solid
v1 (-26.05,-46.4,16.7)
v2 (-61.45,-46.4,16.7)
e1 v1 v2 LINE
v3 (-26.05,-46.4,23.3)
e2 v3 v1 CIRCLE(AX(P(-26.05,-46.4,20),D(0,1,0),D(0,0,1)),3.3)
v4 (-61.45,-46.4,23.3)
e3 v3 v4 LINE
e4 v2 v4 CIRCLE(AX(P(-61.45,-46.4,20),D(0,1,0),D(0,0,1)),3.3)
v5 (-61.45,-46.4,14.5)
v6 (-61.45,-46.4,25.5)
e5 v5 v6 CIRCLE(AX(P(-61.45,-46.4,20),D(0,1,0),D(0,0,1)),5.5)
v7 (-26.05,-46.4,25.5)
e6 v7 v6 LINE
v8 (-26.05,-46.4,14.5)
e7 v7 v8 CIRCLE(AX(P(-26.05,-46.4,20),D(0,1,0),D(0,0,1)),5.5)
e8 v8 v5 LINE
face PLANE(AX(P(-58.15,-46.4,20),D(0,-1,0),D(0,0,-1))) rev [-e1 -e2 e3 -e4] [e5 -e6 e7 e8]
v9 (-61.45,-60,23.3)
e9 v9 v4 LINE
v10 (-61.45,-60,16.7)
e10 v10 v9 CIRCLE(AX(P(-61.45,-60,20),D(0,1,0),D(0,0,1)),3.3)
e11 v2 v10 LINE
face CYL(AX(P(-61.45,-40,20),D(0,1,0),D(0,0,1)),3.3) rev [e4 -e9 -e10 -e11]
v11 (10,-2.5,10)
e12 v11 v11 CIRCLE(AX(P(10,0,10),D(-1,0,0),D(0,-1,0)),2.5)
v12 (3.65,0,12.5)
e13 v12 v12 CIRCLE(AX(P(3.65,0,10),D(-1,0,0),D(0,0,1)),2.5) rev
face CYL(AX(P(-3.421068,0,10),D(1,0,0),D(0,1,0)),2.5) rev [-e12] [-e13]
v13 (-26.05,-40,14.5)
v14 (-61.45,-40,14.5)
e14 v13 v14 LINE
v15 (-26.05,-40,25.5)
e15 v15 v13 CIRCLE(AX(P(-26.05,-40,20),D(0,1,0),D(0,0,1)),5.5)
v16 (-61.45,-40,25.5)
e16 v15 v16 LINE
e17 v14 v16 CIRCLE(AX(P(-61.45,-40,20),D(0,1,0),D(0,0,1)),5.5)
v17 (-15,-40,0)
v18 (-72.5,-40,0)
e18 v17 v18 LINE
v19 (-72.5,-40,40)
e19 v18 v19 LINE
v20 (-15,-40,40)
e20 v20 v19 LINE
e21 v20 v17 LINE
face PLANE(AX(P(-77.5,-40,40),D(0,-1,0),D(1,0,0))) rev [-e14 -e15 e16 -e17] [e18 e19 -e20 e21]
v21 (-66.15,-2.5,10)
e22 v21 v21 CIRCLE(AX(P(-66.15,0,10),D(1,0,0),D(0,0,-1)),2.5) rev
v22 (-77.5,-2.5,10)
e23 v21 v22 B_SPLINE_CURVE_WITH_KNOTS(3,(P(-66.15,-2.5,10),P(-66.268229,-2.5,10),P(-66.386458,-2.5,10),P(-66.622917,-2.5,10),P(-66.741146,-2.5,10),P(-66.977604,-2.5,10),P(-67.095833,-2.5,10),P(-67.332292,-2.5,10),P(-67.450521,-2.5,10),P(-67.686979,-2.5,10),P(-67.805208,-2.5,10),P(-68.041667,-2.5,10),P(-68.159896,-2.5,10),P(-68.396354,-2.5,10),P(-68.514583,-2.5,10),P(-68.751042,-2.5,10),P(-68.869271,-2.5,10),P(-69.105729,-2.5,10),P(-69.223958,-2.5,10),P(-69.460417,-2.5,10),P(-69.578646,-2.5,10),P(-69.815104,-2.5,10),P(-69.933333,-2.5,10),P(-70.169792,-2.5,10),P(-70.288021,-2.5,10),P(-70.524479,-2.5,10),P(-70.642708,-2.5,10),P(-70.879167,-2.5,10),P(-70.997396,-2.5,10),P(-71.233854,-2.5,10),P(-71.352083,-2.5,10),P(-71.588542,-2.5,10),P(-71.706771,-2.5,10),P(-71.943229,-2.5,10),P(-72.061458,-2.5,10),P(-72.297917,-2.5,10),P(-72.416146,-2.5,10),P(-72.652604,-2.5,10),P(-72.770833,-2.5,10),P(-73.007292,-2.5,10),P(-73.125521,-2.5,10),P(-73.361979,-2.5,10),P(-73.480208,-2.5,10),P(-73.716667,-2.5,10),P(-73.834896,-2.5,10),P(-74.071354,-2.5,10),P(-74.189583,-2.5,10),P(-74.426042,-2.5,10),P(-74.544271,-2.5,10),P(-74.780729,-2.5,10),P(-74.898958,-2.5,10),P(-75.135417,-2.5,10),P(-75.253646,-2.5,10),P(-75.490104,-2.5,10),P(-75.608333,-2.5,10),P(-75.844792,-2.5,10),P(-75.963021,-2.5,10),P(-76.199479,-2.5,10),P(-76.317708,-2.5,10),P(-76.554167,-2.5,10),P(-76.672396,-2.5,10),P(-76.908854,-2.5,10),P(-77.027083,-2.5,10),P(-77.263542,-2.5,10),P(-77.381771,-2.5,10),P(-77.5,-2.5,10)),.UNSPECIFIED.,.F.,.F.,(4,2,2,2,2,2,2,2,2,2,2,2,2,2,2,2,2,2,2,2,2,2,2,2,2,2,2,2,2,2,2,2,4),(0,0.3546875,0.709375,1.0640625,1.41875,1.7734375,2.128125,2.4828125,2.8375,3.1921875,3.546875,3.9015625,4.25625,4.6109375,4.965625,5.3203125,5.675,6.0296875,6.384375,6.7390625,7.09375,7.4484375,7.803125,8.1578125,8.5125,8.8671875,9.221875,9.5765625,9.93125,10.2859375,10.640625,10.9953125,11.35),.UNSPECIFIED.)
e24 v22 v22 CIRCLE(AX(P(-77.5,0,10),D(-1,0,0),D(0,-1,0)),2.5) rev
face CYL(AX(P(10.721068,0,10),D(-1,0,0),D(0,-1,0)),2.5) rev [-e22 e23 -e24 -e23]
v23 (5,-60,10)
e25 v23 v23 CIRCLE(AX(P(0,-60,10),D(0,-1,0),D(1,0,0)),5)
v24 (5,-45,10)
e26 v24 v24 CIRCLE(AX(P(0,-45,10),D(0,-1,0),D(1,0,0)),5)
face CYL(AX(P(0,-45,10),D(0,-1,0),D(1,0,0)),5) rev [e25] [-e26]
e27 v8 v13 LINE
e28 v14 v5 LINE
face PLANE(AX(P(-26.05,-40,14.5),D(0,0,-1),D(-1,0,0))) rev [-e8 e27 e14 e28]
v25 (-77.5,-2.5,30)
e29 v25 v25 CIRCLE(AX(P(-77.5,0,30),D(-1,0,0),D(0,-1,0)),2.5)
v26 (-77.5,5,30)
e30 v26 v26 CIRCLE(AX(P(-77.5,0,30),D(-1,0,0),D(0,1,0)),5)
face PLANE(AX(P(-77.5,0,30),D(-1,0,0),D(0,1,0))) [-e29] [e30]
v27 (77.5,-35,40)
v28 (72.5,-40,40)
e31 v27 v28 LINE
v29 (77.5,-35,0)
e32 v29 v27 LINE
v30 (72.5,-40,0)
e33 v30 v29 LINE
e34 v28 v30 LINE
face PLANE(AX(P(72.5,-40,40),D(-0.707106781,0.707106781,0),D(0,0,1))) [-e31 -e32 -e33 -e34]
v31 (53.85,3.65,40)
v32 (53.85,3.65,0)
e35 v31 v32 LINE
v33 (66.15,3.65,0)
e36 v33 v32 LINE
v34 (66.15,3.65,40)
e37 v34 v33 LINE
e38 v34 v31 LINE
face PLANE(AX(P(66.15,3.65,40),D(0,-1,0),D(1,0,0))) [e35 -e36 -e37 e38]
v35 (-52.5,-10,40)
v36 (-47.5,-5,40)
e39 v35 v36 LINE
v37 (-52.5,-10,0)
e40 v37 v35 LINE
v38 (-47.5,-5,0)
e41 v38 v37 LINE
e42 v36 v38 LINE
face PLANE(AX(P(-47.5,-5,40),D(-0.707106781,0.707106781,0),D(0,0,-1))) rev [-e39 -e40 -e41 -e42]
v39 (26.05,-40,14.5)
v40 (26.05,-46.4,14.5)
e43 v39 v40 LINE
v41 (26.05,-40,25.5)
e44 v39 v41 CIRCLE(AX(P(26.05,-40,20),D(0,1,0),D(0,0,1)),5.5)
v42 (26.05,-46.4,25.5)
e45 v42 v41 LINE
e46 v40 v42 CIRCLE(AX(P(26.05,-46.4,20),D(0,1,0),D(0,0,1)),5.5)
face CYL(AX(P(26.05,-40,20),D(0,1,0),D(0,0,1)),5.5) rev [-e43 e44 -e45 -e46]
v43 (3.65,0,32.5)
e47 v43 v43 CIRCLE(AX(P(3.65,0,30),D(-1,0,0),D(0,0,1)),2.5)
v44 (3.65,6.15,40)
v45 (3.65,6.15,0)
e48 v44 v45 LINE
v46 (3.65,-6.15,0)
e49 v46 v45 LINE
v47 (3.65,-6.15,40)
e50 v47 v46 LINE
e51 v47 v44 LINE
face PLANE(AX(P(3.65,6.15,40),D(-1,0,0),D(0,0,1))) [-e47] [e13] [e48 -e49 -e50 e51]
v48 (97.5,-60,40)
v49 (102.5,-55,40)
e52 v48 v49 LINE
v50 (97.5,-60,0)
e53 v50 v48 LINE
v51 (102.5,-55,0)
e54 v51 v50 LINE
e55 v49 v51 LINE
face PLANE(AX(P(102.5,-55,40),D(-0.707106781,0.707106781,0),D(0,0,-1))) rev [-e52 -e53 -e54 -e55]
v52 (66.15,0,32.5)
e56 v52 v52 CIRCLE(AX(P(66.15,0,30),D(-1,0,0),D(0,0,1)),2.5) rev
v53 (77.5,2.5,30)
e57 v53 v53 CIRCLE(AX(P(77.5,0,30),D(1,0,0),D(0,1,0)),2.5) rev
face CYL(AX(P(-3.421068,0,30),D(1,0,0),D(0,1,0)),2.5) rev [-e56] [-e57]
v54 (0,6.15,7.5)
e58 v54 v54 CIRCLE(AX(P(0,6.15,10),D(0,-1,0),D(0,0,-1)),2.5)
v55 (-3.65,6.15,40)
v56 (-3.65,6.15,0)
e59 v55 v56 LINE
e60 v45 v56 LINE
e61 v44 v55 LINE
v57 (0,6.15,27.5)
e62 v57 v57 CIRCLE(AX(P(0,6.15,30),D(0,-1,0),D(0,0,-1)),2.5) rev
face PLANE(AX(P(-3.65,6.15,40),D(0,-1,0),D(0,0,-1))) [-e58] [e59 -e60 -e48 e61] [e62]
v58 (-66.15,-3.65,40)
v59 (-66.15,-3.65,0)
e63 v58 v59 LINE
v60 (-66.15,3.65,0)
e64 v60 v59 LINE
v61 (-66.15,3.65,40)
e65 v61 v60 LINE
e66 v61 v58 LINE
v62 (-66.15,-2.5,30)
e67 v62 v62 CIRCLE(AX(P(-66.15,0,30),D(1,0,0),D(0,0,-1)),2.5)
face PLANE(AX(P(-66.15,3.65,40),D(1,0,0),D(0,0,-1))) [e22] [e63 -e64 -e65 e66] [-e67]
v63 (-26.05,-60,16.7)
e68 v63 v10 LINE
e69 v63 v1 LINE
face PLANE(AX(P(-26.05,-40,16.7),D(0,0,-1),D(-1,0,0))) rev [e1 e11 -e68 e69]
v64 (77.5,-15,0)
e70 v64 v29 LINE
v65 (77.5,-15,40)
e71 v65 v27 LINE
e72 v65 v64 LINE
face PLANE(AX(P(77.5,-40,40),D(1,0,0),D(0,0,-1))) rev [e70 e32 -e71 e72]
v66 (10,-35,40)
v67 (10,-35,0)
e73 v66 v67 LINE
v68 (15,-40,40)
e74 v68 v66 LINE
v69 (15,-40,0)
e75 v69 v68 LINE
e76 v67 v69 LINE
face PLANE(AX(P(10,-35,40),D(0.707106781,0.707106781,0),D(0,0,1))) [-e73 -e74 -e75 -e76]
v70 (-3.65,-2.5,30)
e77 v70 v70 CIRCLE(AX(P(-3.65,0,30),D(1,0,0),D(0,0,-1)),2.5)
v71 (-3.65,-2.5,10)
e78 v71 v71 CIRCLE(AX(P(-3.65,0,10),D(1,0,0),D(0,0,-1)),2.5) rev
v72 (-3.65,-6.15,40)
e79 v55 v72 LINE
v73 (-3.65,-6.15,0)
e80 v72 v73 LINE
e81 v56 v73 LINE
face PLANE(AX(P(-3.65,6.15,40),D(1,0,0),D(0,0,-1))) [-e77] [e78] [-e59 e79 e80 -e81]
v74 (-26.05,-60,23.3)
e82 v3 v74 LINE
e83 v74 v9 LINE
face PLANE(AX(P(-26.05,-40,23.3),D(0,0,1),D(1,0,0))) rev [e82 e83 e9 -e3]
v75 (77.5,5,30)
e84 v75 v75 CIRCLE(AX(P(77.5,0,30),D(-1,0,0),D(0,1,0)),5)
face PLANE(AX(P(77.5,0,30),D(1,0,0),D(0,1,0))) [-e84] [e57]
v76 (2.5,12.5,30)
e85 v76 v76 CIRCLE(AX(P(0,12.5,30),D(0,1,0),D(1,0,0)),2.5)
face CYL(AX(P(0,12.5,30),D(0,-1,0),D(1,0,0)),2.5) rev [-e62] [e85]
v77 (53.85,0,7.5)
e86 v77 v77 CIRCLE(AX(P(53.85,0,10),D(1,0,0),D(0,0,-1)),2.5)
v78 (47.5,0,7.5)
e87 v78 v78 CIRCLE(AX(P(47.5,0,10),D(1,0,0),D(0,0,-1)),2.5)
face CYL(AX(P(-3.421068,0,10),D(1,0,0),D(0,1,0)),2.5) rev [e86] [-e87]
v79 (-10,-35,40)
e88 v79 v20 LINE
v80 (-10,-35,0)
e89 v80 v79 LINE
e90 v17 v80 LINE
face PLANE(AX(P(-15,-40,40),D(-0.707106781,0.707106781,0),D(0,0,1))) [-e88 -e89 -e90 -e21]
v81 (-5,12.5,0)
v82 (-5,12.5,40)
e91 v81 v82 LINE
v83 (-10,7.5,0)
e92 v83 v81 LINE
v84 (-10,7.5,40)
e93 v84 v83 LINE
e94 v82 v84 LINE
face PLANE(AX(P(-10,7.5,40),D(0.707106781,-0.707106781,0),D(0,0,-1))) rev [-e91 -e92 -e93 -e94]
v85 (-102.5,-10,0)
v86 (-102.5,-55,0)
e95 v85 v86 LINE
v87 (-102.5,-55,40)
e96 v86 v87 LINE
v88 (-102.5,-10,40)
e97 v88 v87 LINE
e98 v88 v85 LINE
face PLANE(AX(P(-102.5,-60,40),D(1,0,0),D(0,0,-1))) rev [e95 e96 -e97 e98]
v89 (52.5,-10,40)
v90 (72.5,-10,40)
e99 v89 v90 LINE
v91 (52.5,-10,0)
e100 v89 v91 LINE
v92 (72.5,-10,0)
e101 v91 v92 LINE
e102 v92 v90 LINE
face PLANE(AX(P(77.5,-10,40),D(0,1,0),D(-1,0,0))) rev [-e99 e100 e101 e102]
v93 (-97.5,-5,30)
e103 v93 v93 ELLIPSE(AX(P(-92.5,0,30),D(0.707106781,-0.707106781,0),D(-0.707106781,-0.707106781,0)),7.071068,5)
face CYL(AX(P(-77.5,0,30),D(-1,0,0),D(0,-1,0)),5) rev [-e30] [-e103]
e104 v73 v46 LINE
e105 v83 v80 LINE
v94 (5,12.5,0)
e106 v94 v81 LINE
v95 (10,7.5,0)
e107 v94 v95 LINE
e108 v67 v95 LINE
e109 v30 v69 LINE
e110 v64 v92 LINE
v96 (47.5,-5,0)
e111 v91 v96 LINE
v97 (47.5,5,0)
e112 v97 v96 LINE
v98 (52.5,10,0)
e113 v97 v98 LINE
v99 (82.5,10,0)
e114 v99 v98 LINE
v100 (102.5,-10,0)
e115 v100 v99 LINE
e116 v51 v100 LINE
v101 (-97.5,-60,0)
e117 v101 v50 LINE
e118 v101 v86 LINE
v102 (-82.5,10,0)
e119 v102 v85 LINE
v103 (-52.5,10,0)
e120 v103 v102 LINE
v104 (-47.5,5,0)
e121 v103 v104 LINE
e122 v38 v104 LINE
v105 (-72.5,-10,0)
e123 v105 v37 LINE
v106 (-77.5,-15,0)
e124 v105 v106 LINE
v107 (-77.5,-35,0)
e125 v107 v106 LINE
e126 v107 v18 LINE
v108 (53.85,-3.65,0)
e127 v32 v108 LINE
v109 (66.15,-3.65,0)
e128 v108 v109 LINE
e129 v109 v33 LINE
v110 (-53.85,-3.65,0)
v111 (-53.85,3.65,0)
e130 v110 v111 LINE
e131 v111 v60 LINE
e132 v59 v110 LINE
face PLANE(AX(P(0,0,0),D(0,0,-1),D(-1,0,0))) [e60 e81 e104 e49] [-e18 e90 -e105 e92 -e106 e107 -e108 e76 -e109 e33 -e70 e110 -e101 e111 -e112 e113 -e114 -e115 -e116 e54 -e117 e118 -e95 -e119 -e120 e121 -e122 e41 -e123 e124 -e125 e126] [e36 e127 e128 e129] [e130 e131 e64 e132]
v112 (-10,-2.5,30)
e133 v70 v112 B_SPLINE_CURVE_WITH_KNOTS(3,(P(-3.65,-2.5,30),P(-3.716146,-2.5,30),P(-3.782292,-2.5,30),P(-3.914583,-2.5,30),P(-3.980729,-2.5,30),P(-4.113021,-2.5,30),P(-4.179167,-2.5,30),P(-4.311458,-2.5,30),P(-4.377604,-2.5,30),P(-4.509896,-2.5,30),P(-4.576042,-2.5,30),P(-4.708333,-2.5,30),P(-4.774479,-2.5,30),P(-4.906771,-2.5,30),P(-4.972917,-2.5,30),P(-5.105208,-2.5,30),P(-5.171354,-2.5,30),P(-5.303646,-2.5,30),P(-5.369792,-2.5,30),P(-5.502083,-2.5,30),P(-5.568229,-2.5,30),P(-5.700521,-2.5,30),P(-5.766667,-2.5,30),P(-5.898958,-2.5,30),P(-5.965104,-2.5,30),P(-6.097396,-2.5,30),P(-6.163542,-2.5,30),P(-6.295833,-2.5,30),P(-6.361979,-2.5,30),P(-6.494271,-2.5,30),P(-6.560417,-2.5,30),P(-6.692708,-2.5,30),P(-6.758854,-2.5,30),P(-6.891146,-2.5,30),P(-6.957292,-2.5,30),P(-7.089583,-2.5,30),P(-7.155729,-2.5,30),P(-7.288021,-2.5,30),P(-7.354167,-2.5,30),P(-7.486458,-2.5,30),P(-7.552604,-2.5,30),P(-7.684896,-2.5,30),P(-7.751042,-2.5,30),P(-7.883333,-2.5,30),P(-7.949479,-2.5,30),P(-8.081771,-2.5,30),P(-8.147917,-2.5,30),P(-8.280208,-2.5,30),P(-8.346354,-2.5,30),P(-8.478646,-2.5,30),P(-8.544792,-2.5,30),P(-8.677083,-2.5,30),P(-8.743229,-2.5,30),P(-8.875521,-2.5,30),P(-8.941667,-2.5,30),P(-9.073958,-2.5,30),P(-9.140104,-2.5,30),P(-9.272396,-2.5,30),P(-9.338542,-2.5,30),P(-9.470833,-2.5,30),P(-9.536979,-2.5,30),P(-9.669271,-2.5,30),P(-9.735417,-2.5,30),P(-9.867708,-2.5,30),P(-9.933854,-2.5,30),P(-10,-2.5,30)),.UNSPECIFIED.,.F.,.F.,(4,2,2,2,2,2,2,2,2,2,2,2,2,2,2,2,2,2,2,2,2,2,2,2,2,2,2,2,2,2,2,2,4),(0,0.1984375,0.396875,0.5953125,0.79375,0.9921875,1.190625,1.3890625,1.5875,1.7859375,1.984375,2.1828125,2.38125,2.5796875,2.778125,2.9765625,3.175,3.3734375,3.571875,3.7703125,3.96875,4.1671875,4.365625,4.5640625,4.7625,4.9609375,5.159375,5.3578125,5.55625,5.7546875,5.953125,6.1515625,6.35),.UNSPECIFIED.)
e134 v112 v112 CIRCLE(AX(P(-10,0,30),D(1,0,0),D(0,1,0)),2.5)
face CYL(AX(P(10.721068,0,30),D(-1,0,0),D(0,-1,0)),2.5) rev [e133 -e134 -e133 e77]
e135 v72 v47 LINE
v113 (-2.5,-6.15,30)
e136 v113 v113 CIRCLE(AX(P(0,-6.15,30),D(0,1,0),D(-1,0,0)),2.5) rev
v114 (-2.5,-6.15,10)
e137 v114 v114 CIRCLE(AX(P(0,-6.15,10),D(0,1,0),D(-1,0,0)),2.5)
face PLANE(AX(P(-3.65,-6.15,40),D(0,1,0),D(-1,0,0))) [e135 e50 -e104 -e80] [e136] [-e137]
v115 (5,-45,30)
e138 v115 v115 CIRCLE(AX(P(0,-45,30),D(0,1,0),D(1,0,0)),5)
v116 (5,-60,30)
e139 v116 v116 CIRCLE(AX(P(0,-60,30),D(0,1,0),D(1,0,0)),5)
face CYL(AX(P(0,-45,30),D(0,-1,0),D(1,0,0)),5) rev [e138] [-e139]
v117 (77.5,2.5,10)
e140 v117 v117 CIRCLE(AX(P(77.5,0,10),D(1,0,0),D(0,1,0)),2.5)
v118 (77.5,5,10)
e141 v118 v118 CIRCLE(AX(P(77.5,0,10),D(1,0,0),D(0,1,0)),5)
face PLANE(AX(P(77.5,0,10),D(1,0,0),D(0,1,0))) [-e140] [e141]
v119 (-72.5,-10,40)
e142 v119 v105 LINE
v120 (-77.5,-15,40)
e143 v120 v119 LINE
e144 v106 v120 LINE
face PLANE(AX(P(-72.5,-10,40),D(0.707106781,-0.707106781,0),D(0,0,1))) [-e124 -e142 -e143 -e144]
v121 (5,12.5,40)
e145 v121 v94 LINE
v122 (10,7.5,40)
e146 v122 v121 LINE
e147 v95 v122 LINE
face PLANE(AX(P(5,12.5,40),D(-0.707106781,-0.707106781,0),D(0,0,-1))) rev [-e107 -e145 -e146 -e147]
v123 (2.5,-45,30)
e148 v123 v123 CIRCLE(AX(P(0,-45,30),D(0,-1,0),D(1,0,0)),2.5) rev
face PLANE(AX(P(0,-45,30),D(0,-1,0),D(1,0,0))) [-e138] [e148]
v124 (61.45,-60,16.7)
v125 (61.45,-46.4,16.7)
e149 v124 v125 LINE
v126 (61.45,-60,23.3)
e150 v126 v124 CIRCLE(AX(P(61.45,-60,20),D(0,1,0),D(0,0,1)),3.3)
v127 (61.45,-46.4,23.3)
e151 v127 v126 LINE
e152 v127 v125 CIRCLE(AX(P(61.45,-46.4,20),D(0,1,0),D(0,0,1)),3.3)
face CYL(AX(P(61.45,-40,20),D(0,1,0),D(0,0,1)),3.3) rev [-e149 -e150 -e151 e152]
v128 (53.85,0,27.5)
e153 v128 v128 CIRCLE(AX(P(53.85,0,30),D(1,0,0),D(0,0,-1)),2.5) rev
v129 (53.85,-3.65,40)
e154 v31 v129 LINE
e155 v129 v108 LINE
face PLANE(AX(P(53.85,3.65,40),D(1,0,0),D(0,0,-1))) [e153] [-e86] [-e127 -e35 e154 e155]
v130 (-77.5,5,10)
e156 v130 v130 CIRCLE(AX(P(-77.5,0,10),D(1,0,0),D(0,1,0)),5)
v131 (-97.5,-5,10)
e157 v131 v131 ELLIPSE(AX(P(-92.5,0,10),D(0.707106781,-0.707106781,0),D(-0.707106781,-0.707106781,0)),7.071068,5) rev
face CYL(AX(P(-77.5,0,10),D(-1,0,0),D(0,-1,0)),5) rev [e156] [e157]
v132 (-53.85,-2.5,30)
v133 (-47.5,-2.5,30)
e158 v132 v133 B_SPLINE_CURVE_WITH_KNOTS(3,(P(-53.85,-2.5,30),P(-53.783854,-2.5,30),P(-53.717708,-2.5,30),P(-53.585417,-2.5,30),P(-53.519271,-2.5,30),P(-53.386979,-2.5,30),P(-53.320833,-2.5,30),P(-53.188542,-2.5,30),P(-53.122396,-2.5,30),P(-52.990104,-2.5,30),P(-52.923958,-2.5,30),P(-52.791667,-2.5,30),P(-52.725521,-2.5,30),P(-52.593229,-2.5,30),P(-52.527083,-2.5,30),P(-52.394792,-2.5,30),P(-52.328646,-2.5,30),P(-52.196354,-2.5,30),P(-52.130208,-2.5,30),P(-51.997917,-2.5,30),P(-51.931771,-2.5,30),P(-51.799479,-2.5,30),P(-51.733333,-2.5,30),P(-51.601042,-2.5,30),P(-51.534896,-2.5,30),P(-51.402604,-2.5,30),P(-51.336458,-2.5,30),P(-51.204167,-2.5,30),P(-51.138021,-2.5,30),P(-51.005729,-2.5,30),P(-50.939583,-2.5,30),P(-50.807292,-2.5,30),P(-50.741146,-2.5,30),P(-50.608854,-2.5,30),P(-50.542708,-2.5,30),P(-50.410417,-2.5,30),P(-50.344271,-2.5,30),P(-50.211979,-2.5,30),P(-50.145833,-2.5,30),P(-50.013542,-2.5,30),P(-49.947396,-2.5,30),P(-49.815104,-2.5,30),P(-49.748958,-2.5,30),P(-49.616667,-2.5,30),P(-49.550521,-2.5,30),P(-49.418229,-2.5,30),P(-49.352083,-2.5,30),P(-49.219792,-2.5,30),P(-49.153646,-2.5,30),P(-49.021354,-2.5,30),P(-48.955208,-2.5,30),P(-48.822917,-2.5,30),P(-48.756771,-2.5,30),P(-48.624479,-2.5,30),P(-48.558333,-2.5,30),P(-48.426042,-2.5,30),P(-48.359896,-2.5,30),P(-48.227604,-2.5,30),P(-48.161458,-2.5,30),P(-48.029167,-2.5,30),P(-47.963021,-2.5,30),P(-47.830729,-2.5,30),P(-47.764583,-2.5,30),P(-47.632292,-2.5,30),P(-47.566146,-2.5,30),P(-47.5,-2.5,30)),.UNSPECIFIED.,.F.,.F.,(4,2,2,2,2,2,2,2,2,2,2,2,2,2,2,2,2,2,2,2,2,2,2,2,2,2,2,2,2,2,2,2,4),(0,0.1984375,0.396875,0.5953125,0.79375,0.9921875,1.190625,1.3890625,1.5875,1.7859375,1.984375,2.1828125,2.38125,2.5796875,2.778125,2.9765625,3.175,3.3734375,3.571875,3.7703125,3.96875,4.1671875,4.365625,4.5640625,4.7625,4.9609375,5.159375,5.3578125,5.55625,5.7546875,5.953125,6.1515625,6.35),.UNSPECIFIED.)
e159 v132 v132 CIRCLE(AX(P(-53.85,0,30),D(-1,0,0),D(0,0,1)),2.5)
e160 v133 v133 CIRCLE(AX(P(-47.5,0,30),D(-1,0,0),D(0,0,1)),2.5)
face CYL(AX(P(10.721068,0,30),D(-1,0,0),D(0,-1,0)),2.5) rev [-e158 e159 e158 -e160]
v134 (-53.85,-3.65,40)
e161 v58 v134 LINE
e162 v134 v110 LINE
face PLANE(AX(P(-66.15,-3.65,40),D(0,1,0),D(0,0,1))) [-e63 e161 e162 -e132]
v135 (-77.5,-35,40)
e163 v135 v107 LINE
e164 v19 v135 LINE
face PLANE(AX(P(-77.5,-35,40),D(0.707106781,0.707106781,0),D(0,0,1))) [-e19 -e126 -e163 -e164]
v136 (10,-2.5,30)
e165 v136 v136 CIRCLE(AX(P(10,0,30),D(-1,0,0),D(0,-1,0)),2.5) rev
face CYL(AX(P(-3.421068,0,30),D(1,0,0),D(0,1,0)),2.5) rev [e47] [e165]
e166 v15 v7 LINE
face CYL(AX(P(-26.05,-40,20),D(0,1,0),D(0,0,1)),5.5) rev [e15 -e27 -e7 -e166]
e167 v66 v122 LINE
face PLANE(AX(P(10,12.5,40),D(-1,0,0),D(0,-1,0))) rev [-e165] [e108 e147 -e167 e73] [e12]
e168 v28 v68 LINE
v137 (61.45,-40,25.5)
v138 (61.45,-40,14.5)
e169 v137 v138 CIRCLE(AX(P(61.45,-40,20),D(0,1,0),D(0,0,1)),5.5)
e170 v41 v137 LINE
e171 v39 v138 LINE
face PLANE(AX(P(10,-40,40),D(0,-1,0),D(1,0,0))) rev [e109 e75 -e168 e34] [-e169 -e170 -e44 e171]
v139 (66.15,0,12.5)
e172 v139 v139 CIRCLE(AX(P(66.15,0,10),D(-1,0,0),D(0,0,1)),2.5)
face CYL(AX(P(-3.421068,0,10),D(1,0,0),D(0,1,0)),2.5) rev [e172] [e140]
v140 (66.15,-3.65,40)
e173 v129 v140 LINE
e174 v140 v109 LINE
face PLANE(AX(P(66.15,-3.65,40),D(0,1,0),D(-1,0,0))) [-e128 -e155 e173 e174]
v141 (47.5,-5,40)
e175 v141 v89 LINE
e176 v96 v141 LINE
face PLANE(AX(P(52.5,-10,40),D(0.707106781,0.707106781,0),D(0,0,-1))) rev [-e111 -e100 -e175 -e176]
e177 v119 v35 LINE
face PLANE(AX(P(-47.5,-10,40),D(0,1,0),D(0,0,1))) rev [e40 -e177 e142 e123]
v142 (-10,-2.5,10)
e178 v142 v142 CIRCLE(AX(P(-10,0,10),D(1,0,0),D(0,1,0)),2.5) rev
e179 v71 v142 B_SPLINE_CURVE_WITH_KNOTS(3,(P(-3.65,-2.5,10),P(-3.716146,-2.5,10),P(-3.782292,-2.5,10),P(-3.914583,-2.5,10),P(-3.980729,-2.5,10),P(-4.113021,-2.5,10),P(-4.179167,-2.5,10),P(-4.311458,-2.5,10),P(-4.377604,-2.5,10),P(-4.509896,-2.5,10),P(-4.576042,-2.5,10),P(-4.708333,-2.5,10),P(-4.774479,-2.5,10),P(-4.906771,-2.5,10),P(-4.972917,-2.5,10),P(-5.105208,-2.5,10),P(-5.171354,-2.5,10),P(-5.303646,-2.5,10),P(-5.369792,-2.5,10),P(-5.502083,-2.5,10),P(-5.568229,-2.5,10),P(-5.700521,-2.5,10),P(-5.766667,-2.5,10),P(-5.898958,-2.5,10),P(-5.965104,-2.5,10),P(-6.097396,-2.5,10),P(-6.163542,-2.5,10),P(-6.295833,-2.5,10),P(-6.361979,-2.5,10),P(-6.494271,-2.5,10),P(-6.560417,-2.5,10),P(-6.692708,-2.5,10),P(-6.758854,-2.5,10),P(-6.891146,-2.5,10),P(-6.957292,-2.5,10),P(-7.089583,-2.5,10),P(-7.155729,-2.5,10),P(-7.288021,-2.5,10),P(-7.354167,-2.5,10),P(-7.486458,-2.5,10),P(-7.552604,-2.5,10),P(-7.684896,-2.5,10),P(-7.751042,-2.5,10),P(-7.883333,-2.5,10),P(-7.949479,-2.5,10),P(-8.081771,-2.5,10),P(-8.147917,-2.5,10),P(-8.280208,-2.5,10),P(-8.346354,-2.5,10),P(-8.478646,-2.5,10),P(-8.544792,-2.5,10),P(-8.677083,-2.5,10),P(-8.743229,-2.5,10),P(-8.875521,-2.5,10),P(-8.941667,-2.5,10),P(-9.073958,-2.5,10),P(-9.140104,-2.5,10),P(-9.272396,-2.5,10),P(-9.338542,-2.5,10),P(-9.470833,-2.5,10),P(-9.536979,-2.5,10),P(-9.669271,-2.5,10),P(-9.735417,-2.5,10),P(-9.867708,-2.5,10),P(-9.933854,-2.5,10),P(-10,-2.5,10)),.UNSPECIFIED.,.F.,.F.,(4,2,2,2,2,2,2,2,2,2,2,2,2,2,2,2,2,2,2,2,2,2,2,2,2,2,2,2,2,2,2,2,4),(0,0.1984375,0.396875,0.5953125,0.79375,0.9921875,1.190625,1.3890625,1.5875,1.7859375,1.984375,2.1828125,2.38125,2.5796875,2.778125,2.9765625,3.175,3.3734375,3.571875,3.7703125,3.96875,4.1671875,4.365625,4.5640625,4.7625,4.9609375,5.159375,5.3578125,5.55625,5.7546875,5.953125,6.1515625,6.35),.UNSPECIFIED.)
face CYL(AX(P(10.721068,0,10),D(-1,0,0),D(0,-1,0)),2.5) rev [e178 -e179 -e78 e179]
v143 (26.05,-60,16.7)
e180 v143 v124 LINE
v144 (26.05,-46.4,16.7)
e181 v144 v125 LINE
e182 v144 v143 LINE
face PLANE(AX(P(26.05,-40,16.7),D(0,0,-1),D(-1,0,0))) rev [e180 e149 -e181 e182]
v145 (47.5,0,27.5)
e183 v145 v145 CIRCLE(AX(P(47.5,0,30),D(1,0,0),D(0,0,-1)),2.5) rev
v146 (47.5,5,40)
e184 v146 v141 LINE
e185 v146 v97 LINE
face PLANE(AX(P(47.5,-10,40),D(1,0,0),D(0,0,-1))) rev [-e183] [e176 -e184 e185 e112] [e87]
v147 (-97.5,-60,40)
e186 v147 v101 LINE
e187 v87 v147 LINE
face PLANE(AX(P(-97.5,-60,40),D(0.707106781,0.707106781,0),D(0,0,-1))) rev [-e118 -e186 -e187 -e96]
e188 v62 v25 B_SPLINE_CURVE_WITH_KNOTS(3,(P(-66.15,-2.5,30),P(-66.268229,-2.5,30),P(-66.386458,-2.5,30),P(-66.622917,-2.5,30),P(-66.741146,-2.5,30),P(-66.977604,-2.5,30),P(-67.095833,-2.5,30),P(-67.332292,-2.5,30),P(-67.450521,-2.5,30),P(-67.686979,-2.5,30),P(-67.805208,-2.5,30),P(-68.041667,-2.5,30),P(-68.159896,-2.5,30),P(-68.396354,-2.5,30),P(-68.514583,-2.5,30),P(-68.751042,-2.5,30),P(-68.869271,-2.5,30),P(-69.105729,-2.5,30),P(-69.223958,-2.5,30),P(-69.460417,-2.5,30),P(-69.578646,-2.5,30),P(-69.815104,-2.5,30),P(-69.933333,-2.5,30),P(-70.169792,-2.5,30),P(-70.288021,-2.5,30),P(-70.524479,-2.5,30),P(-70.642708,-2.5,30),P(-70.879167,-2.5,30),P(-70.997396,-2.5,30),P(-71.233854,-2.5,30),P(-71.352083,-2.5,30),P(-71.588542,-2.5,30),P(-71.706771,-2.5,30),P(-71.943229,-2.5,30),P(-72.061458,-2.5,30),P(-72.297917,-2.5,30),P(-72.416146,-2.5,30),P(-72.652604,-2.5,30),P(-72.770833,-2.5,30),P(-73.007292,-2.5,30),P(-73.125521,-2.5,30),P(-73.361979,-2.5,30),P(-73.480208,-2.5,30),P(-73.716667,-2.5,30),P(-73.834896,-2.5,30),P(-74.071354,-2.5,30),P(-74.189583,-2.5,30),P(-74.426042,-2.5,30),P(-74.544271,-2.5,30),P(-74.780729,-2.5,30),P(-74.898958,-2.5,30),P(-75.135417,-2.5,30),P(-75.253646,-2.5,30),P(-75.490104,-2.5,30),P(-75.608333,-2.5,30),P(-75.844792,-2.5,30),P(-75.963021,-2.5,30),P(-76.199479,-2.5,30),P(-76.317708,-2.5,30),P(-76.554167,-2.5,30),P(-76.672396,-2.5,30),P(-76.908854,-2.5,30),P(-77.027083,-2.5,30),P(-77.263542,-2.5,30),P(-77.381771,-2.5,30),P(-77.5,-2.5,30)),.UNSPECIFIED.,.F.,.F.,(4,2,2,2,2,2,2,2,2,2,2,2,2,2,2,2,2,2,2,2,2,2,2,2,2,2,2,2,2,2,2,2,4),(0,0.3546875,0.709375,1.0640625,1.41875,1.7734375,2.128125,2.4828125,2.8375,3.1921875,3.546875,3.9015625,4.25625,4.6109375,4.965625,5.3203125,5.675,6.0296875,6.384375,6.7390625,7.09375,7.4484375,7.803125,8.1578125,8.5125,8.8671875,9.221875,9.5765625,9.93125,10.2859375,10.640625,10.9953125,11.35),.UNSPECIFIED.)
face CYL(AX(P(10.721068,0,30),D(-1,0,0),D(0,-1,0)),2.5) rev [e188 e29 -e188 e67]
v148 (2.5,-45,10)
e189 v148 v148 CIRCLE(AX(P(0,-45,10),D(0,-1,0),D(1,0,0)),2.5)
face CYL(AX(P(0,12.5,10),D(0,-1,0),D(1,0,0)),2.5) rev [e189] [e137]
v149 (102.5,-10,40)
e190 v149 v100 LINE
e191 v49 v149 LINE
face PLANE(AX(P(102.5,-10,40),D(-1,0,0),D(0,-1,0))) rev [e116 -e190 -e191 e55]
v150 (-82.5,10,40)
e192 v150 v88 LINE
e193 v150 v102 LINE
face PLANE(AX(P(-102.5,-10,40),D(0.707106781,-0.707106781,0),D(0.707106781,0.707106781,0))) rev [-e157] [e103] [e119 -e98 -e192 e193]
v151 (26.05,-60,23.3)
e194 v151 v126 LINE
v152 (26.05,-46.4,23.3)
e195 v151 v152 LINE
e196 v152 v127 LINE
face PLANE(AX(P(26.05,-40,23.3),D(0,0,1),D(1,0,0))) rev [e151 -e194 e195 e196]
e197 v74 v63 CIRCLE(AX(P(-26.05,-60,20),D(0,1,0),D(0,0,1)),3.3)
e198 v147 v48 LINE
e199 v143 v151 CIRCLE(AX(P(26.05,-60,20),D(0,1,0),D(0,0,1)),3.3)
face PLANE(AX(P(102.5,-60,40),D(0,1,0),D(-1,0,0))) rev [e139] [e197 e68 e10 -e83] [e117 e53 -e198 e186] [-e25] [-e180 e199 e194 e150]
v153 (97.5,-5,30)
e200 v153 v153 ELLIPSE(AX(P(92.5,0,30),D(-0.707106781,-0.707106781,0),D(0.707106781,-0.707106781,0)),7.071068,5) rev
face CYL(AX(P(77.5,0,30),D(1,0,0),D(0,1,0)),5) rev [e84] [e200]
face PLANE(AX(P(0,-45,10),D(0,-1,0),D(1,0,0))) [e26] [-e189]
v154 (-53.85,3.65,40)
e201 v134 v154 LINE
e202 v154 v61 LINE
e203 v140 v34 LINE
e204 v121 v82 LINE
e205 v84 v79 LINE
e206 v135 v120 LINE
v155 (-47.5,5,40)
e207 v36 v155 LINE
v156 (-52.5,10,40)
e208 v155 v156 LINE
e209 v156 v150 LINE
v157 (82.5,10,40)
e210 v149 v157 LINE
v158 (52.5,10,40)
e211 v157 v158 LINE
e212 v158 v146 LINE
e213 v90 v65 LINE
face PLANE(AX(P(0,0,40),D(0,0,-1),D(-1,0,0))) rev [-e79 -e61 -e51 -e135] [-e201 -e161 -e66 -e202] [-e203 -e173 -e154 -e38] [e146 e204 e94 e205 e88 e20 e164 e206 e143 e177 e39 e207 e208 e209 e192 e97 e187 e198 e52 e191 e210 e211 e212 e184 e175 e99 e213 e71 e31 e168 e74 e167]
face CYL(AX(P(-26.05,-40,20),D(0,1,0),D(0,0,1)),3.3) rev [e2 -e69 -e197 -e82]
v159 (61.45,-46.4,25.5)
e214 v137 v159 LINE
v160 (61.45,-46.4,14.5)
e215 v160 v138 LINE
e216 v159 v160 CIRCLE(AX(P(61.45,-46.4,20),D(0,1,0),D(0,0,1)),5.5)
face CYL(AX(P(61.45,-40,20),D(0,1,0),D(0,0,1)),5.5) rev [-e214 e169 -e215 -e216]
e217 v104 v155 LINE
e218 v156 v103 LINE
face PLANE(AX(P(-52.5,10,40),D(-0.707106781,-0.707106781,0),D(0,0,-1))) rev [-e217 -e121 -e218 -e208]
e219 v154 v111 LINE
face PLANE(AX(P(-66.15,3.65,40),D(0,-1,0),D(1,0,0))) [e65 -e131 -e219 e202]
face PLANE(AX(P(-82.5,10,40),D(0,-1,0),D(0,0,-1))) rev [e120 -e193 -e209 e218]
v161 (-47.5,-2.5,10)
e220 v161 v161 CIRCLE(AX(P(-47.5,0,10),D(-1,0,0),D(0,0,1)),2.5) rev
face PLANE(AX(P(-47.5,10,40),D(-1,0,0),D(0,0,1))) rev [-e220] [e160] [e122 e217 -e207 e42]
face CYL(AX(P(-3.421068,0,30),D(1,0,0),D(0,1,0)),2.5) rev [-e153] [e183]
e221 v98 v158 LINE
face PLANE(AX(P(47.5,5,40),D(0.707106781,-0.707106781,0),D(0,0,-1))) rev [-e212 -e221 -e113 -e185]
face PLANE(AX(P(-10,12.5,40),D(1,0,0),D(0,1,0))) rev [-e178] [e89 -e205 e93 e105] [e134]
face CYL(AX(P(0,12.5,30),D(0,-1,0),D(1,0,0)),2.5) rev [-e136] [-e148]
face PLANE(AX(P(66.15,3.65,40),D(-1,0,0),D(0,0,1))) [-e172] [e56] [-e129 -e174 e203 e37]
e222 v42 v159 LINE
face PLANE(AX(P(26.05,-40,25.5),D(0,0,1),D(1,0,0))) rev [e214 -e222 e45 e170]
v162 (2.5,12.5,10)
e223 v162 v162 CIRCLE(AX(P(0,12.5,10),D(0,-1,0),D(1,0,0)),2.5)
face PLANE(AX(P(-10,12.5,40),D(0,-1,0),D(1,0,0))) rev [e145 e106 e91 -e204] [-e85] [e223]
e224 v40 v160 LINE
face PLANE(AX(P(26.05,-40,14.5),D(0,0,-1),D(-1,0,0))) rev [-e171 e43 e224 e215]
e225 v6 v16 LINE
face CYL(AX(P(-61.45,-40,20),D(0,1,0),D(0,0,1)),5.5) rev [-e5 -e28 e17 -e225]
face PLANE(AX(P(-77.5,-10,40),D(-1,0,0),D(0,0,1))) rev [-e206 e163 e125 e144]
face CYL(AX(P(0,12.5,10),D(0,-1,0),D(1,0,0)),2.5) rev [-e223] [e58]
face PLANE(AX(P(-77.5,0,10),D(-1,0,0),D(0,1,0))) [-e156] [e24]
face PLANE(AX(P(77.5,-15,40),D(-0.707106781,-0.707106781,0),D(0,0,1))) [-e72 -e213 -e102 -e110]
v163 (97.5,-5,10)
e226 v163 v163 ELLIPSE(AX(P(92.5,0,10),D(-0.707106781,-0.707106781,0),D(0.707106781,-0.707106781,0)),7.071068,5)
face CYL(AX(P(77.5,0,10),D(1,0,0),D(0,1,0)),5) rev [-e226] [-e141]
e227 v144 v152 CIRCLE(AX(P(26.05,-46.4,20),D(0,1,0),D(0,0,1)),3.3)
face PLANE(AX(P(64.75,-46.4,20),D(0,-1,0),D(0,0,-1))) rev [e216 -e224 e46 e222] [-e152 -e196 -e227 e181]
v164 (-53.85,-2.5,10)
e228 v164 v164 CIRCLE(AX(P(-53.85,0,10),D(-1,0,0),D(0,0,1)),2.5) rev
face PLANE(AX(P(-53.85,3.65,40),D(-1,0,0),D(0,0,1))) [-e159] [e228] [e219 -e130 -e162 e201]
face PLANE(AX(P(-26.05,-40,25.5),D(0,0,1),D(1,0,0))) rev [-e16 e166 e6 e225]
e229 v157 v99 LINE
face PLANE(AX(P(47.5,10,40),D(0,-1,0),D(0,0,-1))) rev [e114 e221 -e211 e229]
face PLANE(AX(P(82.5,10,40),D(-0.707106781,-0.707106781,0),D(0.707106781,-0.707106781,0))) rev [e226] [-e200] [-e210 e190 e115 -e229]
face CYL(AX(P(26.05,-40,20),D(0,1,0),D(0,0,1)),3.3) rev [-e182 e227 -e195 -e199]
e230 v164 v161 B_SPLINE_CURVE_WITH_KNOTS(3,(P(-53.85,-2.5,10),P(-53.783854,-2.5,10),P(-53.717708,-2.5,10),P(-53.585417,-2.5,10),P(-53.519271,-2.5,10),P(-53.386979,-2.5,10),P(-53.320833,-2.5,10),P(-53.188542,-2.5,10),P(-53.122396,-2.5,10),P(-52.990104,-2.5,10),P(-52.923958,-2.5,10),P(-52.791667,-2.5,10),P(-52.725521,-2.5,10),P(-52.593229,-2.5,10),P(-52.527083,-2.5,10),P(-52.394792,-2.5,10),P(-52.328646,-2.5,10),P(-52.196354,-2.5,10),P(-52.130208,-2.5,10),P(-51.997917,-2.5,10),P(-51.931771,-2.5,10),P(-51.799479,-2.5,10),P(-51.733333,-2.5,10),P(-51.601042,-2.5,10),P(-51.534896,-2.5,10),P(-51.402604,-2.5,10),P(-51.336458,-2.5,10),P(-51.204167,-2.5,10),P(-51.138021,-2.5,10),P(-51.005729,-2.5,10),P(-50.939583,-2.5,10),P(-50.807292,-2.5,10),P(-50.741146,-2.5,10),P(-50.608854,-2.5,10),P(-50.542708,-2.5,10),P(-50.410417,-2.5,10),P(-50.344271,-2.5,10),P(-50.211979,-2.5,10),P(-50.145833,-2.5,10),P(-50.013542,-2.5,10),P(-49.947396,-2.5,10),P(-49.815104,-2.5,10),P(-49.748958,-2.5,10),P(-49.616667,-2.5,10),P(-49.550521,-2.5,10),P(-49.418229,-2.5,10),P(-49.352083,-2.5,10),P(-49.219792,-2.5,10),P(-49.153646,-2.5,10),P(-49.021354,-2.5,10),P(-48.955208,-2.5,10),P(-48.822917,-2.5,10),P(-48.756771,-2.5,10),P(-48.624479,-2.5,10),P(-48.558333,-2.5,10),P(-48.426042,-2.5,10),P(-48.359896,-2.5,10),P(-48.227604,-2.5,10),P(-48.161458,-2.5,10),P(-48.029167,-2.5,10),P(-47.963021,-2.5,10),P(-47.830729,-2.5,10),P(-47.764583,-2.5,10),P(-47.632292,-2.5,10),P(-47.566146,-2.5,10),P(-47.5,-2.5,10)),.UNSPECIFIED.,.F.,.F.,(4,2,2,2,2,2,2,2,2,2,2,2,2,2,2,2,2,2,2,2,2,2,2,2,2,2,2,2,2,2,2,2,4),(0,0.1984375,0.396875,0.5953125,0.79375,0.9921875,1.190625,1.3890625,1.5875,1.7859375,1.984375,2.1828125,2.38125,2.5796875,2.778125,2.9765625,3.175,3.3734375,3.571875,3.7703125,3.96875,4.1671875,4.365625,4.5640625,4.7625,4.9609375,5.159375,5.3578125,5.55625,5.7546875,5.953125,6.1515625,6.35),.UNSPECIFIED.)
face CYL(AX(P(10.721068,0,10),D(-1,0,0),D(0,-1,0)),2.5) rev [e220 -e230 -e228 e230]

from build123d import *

# Parameters (mm, degrees)
SKETCH_1_W                  = 12.3
SKETCH_1_H                  = 7.3
SKETCH_1_W_2                = 7.3
SKETCH_1_H_2                = 12.3
EXTRUDE_1_DEPTH             = 40
CHAMFER_1_SIZE              = 5
CHAMFER_2_SIZE              = 5
CHAMFER_3_SIZE              = 5
SKETCH_25_R                 = 5
CUT_EXTRUDE_1452_DEPTH      = 15
SKETCH_26_R                 = 2.5
CUT_EXTRUDE_1599_DEPTH      = 132.766839531
SKETCH_23_R                 = 5
CUT_EXTRUDE_1755_DEPTH      = 25
CUT_EXTRUDE_1893_REACH      = 219.313
SKETCH_24_R                 = 2.5
MIRROR_2083_COPY_1_SKETCH_R = 5
MIRROR_2083_COPY_1_DEPTH    = 25
MIRROR_2083_COPY_2_REACH    = 219.313
MIRROR_2083_COPY_2_SKETCH_R = 2.5
HOLE_START                  = -60
HOLE_WIZARD_M6_2_DEPTH      = 20
HOLE_START_2                = -46.4
HOLE_WIZARD_M6_2_2_DEPTH    = 6.4


# Read off the part's stored shape, not the designer's step: M6 六角承窩頭蓋螺釘的柱孔2
with BuildPart() as part:
    # 草圖1 → 填料-伸長1 (new body)
    with BuildSketch(Plane.XY):
        Polygon((-82.5, 10), (-47.5, 10), (-47.5, -10), (-77.5, -10), (-77.5, -40), (-10, -40), (-10, 12.5), (10, 12.5), (10, -40), (77.5, -40), (77.5, -10), (47.5, -10), (47.5, 10), (82.5, 10), (102.5, -10), (102.5, -60), (-102.5, -60), (-102.5, -10), align=None)
        with Locations((60, 0)):
            Rectangle(SKETCH_1_W, SKETCH_1_H, mode=Mode.SUBTRACT)
        with Locations((-60, 0)):
            Rectangle(SKETCH_1_W, SKETCH_1_H, mode=Mode.SUBTRACT)
        Rectangle(SKETCH_1_W_2, SKETCH_1_H_2, mode=Mode.SUBTRACT)
    extrude(amount=EXTRUDE_1_DEPTH)

    # 導角1
    chamfer_1_edges = [part.edges().sort_by_distance(p)[0] for p in [
        (-47.5, -10, 20),
        (-10, 12.5, 20),
        (10, 12.5, 20),
        (47.5, -10, 20),
        (47.5, 10, 20),
        (-47.5, 10, 20),
    ]]
    chamfer(chamfer_1_edges, length=CHAMFER_1_SIZE)

    # 導角2
    chamfer_2_edges = [part.edges().sort_by_distance(p)[0] for p in [
        (-77.5, -10, 20),
        (-77.5, -40, 20),
        (-10, -40, 20),
        (10, -40, 20),
        (77.5, -40, 20),
        (77.5, -10, 20),
    ]]
    chamfer(chamfer_2_edges, length=CHAMFER_2_SIZE)

    # 導角3
    chamfer_3_edges = [part.edges().sort_by_distance(p)[0] for p in [
        (102.5, -60, 20),
        (-102.5, -60, 20),
    ]]
    chamfer(chamfer_3_edges, length=CHAMFER_3_SIZE)

    # 草圖25 → Cut-Extrude 1452 (cut)
    with BuildSketch(Plane(origin=(0, -60, 0), x_dir=(-1, 0, 0), z_dir=(0, -1, 0))):
        with Locations(Location((0, -10, 0), (0, 0, 180))):
            Circle(SKETCH_25_R)
    cut_extrude_1452 = extrude(amount=-CUT_EXTRUDE_1452_DEPTH, mode=Mode.SUBTRACT)

    # 草圖26 → Cut-Extrude 1599 (cut, through all)
    with BuildSketch(Plane(origin=(0, -60, 0), x_dir=(-1, 0, 0), z_dir=(0, -1, 0))):
        with Locations(Location((0, -10, 0), (0, 0, 180))):
            Circle(SKETCH_26_R)
    cut_extrude_1599 = extrude(amount=-CUT_EXTRUDE_1599_DEPTH, mode=Mode.SUBTRACT)

    # Mirror 1698: Cut-Extrude 1452, Cut-Extrude 1599 across plane
    add(cut_extrude_1452.mirror(Plane(origin=(0, 0, 20), x_dir=(1, 0, 0), z_dir=(0, 0, -1))), mode=Mode.SUBTRACT)
    add(cut_extrude_1599.mirror(Plane(origin=(0, 0, 20), x_dir=(1, 0, 0), z_dir=(0, 0, -1))), mode=Mode.SUBTRACT)

    # 草圖23 → Cut-Extrude 1755 (cut)
    with BuildSketch(Plane(origin=(102.5, 0, 0), x_dir=(0, 0, -1), z_dir=(1, 0, 0))):
        with Locations(Location((-10, 0, 0), (0, 0, 90))):
            Circle(SKETCH_23_R)
    cut_extrude_1755 = extrude(amount=-CUT_EXTRUDE_1755_DEPTH, mode=Mode.SUBTRACT)

    # Cut-Extrude 1893: up to this face of the body (flat: up to its plane)
    cut_extrude_1893_end = Plane(part.part.faces().sort_by_distance((3.65, 0, 20))[0])
    # 草圖24 → Cut-Extrude 1893 (cut, up to the picked face)
    with BuildSketch(Plane(origin=(102.5, 0, 0), x_dir=(0, 0, -1), z_dir=(1, 0, 0)), mode=Mode.PRIVATE) as cut_extrude_1893_sk1:
        with Locations(Location((-10, 0, 0), (0, 0, 90))):
            Circle(SKETCH_24_R)
    cut_extrude_1893_tool1 = split(extrude(cut_extrude_1893_sk1.sketch, amount=-CUT_EXTRUDE_1893_REACH, mode=Mode.PRIVATE), bisect_by=cut_extrude_1893_end, keep=Keep.BOTH, mode=Mode.PRIVATE)
    cut_extrude_1893 = cut_extrude_1893_tool1.solids().sort_by(Axis((102.5, 0, 10), (-1, 0, 0)))[0]
    add(cut_extrude_1893, mode=Mode.SUBTRACT)

    # Mirror 2006: Cut-Extrude 1755, Cut-Extrude 1893 across plane
    add(cut_extrude_1755.mirror(Plane.ZY), mode=Mode.SUBTRACT)
    add(cut_extrude_1893.mirror(Plane.ZY), mode=Mode.SUBTRACT)

    # Mirror 2083: Cut-Extrude 1755, Cut-Extrude 1893 across plane
    add(cut_extrude_1755.mirror(Plane(origin=(0, 0, 20), x_dir=(1, 0, 0), z_dir=(0, 0, -1))), mode=Mode.SUBTRACT)
    add(cut_extrude_1893.mirror(Plane(origin=(0, 0, 20), x_dir=(1, 0, 0), z_dir=(0, 0, -1))), mode=Mode.SUBTRACT)

    # Mirror 2083 copy 1 sketch → Mirror 2083 copy 1 (cut)
    with BuildSketch(Plane(origin=(-102.5, 0, 40), x_dir=(0, 0, 1), z_dir=(-1, 0, 0))):
        with Locations(Location((-10, 0, 0), (0, 0, 90))):
            Circle(MIRROR_2083_COPY_1_SKETCH_R)
    extrude(amount=-MIRROR_2083_COPY_1_DEPTH, mode=Mode.SUBTRACT)

    # Mirror 2083 copy 2: up to this face of the body (flat: up to its plane)
    mirror_2083_copy_2_end = Plane(part.part.faces().sort_by_distance((-3.65, 0, 20))[0])
    # Mirror 2083 copy 2 sketch → Mirror 2083 copy 2 (cut, up to the picked face)
    with BuildSketch(Plane(origin=(-102.5, 0, 40), x_dir=(0, 0, 1), z_dir=(-1, 0, 0)), mode=Mode.PRIVATE) as mirror_2083_copy_2_sk1:
        with Locations(Location((-10, 0, 0), (0, 0, 90))):
            Circle(MIRROR_2083_COPY_2_SKETCH_R)
    mirror_2083_copy_2_tool1 = split(extrude(mirror_2083_copy_2_sk1.sketch, amount=-MIRROR_2083_COPY_2_REACH, mode=Mode.PRIVATE), bisect_by=mirror_2083_copy_2_end, keep=Keep.BOTH, mode=Mode.PRIVATE)
    add(mirror_2083_copy_2_tool1.solids().sort_by(Axis((-102.5, 0, 30), (1, 0, 0)))[0], mode=Mode.SUBTRACT)

    # M6 六角承窩頭蓋螺釘的柱孔2 outline → M6 六角承窩頭蓋螺釘的柱孔2 (cut)
    with BuildSketch(Plane(origin=(0, 0, 0), x_dir=(1, 0, 0), z_dir=(0, 1, 0)).offset(HOLE_START)):
        with BuildLine():
            Line((26.05, -23.3), (61.45, -23.3))
            ThreePointArc((61.45, -23.3), (64.75, -20), (61.45, -16.7))
            Line((61.45, -16.7), (26.05, -16.7))
            ThreePointArc((26.05, -16.7), (22.75, -20), (26.05, -23.3))
        make_face()
    hole_wizard_m6_2 = extrude(amount=HOLE_WIZARD_M6_2_DEPTH, mode=Mode.SUBTRACT)

    # Hole Wizard M6 _2 2 outline → Hole Wizard M6 _2 2 (cut)
    with BuildSketch(Plane(origin=(0, 0, 0), x_dir=(1, 0, 0), z_dir=(0, 1, 0)).offset(HOLE_START_2)):
        with BuildLine():
            Line((26.05, -25.5), (61.45, -25.5))
            ThreePointArc((61.45, -25.5), (66.95, -20), (61.45, -14.5))
            Line((61.45, -14.5), (26.05, -14.5))
            ThreePointArc((26.05, -14.5), (20.55, -20), (26.05, -25.5))
        make_face()
        with BuildLine():
            ThreePointArc((61.45, -16.7), (64.75, -20), (61.45, -23.3))
            Line((61.45, -23.3), (26.05, -23.3))
            ThreePointArc((26.05, -23.3), (22.75, -20), (26.05, -16.7))
            Line((26.05, -16.7), (61.45, -16.7))
        make_face(mode=Mode.SUBTRACT)
    hole_wizard_m6_2_2 = extrude(amount=HOLE_WIZARD_M6_2_2_DEPTH, mode=Mode.SUBTRACT)

    # Mirror 2781: M6 六角承窩頭蓋螺釘的柱孔2, Hole Wizard M6 _2 2 across plane
    add(hole_wizard_m6_2.mirror(Plane.ZY), mode=Mode.SUBTRACT)
    add(hole_wizard_m6_2_2.mirror(Plane.ZY), mode=Mode.SUBTRACT)


solid = part.part
